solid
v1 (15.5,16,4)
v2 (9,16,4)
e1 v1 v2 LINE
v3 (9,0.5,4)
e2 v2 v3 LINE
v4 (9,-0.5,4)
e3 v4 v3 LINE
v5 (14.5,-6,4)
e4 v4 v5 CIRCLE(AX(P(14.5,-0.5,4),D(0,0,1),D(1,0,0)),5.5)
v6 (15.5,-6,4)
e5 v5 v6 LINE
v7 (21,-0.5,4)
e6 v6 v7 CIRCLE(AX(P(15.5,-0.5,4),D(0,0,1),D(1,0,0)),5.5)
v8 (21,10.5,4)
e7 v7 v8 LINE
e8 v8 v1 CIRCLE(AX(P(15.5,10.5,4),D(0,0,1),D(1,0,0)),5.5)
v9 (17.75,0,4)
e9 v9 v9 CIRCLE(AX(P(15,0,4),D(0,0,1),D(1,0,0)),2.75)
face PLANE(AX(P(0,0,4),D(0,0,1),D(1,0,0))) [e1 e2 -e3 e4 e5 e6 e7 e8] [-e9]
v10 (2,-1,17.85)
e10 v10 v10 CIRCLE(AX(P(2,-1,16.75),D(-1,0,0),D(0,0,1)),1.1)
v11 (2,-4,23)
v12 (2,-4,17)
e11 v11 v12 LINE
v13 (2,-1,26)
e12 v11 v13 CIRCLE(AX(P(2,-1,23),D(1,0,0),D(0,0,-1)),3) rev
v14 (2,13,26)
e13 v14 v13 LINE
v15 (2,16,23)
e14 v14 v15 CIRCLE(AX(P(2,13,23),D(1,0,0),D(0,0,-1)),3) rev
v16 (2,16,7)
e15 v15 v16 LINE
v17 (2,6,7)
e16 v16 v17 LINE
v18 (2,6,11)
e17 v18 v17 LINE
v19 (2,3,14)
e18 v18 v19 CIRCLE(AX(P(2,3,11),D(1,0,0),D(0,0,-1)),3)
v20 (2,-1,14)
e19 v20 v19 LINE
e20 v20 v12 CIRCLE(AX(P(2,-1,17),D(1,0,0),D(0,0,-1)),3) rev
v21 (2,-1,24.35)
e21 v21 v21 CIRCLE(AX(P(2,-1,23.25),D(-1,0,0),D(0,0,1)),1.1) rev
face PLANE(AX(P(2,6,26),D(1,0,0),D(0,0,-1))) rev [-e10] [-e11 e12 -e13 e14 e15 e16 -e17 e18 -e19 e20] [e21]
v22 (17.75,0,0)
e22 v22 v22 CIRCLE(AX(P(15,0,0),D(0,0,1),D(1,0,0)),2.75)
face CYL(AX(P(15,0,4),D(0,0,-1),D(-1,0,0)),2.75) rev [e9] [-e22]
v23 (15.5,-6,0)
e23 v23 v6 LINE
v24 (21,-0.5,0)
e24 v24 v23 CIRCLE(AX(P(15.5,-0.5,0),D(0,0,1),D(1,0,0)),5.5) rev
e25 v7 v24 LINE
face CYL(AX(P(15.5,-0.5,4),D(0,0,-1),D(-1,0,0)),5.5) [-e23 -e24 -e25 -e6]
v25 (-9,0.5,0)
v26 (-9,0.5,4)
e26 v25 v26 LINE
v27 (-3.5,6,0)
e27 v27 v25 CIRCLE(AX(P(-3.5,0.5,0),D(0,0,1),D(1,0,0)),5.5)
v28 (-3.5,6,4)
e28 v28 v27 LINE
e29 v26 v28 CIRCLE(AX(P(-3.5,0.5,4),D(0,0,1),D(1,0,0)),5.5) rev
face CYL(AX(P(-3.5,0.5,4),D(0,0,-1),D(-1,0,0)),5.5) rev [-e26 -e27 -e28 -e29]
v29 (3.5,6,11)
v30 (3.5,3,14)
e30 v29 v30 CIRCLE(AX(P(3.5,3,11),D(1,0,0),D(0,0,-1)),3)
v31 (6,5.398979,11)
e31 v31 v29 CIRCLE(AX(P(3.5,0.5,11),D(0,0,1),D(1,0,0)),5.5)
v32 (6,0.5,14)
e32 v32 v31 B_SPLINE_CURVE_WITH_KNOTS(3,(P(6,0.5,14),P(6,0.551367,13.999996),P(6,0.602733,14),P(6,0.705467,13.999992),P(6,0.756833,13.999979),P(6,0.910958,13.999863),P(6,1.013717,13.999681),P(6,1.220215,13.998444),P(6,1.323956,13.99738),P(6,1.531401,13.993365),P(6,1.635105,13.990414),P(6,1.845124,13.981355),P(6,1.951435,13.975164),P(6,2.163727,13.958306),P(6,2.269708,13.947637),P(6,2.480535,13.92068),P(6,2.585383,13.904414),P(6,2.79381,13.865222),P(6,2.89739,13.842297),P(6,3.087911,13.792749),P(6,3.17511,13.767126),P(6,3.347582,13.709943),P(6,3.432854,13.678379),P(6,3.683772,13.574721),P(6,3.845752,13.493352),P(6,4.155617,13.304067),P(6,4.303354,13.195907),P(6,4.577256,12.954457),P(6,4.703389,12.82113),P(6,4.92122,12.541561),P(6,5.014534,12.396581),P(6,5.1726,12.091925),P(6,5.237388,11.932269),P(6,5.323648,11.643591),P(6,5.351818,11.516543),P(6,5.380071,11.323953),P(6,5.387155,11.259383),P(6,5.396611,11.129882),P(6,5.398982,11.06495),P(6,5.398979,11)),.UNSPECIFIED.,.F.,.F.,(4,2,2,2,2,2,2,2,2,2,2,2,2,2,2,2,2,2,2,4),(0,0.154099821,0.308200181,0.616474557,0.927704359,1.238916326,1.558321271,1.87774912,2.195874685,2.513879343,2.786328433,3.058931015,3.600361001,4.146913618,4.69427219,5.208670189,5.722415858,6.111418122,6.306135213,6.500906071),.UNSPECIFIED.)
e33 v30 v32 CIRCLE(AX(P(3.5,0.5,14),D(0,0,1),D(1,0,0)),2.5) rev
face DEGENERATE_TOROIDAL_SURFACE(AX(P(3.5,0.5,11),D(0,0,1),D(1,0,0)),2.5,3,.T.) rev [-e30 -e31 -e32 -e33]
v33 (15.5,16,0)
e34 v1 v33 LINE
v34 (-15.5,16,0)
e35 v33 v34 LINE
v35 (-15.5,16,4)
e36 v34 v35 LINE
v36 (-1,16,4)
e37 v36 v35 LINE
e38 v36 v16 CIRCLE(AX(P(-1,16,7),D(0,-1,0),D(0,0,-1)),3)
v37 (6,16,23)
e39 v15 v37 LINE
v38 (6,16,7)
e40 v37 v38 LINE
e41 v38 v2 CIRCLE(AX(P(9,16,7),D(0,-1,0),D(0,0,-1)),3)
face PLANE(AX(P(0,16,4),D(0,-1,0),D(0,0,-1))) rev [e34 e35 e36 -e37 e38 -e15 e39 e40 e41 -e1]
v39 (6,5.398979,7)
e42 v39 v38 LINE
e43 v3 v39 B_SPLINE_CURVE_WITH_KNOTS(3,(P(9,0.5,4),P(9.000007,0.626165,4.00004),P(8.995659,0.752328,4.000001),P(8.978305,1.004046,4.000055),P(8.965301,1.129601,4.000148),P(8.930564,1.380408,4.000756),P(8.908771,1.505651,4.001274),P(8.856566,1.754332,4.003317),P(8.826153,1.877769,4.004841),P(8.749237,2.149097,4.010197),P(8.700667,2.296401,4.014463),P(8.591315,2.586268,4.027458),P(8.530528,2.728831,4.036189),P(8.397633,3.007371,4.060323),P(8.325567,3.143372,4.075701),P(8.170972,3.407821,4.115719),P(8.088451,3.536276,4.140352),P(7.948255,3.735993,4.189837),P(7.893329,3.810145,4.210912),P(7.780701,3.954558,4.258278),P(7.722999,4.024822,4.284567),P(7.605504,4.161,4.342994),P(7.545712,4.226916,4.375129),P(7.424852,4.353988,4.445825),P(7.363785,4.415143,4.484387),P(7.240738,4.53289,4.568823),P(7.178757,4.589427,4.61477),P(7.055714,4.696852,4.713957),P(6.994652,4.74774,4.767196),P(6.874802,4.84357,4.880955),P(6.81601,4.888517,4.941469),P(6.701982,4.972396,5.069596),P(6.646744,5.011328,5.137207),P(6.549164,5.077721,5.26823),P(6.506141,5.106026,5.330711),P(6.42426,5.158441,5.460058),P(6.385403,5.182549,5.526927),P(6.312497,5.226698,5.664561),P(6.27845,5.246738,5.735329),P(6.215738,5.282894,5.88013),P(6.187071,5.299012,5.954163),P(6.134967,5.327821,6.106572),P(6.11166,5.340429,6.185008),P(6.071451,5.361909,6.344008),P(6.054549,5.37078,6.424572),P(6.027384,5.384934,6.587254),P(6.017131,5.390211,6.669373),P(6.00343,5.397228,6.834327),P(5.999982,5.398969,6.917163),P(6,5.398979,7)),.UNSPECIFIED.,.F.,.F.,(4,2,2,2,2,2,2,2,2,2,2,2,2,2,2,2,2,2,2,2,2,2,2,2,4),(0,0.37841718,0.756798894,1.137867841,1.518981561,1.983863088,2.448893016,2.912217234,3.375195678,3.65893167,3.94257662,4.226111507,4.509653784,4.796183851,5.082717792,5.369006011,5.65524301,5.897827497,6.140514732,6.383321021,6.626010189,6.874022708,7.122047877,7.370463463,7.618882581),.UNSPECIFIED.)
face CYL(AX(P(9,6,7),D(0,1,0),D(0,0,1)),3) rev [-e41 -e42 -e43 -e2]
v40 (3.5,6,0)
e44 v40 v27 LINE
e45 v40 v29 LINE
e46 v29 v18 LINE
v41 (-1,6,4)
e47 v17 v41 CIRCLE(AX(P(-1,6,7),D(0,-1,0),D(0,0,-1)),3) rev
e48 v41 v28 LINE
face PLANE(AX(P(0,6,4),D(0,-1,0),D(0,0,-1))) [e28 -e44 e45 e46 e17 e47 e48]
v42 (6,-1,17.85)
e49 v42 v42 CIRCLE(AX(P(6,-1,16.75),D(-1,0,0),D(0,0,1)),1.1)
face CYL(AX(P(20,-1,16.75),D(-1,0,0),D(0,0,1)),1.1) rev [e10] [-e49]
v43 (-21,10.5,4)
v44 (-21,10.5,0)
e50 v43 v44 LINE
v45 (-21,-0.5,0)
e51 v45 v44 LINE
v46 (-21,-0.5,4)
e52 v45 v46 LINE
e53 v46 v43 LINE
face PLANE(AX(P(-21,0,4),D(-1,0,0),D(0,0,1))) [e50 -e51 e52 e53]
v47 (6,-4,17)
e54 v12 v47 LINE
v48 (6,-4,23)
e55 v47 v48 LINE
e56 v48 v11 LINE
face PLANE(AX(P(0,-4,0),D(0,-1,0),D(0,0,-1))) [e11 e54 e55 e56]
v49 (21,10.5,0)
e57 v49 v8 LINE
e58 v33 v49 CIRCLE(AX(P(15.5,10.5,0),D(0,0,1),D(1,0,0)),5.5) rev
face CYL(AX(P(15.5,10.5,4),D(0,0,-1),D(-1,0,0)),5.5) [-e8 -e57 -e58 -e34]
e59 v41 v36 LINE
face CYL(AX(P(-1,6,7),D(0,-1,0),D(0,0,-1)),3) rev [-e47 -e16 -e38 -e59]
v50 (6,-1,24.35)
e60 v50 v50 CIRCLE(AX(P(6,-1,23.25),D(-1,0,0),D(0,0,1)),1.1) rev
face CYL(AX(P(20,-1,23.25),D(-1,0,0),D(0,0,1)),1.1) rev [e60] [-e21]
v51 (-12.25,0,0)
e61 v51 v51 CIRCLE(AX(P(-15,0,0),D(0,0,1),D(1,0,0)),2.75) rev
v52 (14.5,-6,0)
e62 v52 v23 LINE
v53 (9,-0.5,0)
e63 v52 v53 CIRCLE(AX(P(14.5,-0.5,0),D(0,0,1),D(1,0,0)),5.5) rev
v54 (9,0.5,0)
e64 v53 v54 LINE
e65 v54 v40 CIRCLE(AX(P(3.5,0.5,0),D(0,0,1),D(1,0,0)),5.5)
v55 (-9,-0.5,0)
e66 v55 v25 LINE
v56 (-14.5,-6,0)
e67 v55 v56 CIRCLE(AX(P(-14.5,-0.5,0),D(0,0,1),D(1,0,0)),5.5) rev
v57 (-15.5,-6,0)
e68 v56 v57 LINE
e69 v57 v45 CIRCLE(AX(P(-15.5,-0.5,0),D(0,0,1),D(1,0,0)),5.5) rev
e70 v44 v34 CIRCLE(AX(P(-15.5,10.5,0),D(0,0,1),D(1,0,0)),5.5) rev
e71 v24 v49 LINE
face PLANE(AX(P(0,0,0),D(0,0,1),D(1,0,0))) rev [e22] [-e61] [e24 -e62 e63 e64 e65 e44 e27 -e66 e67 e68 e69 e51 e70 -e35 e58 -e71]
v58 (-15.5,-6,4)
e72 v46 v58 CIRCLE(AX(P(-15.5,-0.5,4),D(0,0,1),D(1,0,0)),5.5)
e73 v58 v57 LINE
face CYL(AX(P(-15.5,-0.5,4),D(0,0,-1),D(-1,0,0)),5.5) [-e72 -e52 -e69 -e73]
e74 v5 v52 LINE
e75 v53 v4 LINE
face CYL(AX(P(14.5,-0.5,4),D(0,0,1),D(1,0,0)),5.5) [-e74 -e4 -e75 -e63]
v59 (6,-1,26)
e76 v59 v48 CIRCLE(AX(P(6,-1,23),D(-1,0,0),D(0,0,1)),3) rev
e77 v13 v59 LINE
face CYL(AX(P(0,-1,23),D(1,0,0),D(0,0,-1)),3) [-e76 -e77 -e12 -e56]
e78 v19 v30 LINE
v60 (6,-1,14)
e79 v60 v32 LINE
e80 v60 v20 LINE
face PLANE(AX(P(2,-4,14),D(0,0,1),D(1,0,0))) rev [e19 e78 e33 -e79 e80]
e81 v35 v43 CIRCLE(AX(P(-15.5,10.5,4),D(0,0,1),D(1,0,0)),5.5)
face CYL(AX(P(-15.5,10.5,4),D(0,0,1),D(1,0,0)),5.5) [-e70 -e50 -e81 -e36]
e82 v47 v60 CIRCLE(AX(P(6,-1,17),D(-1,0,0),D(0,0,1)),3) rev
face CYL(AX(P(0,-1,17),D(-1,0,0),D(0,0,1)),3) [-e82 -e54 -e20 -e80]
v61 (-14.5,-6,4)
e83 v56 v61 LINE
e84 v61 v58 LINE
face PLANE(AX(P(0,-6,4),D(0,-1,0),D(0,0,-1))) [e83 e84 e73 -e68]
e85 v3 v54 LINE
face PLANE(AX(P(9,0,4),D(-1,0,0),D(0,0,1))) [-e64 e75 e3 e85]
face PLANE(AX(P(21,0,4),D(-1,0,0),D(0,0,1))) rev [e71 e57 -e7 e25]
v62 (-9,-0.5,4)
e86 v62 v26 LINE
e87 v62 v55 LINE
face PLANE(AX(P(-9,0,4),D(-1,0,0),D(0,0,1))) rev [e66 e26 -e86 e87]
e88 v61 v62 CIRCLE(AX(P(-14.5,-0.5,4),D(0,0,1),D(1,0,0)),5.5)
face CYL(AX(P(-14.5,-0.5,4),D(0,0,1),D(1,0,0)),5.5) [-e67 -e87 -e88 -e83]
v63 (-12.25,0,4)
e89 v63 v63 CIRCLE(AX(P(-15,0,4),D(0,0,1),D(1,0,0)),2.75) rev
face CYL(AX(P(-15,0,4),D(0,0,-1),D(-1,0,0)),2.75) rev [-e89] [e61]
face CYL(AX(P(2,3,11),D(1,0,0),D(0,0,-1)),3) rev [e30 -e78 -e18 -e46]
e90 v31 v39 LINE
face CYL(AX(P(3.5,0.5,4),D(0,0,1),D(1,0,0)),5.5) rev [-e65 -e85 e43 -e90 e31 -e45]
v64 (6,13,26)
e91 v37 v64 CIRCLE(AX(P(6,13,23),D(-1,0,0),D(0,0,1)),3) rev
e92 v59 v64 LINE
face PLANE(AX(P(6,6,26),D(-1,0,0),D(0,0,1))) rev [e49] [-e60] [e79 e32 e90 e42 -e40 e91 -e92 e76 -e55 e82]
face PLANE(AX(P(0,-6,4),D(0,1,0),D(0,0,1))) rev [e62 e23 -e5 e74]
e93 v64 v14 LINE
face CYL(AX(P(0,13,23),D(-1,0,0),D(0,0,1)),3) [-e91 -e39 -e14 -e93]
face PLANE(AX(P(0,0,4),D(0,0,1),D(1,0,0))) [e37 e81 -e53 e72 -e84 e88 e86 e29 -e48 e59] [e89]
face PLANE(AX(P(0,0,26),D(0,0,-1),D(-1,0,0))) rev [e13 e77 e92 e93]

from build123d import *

# Parameters (mm, degrees)
SKETCH1_W           = 12
SKETCH1_H           = 12
SKETCH1_R           = 2.75
BOSS_EXTRUDE1_DEPTH = 4
SKETCH2_W           = 4
SKETCH2_H           = 10
BOSS_EXTRUDE2_DEPTH = 22
SKETCH3_W           = 4
SKETCH3_H           = 12
BOSS_EXTRUDE3_DEPTH = 10
SKETCH4_R           = 1.1
CUT_EXTRUDE1_DEPTH  = 18
FILLET1_R           = 5.5
FILLET2_R           = 3


with BuildPart() as part:
    # Sketch1 → Boss-Extrude1 (new body)
    # profile 1 of 4: a face of its own
    with BuildSketch(Plane.XY):
        Polygon((9, 6), (9, 0), (9, -6), (21, -6), (21, 6), align=None)
        with BuildLine():
            ThreePointArc((17.75, 0), (15, -2.75), (12.25, 0))
            ThreePointArc((12.25, 0), (15, 2.75), (17.75, 0))
        make_face(mode=Mode.SUBTRACT)
    # profile 2 of 4: a face of its own
    with BuildSketch(Plane.XY):
        Polygon((0, 6), (9, 6), (21, 6), (21, 16), (0, 16), align=None)
    # profile 3 of 4: a face of its own
    with BuildSketch(Plane.XY):
        Polygon((-9, 6), (0, 6), (0, 16), (-21, 16), (-21, 6), align=None)
    # profile 4 of 4: a face of its own
    with BuildSketch(Plane.XY):
        with Locations((-15, 0)):
            Rectangle(SKETCH1_W, SKETCH1_H)
        with Locations((-15, 0)):
            Circle(SKETCH1_R, mode=Mode.SUBTRACT)
    extrude(amount=BOSS_EXTRUDE1_DEPTH)

    # Sketch2 → Boss-Extrude2 (add)
    with BuildSketch(Plane.XY.offset(4)):
        with Locations((4, 11)):
            Rectangle(SKETCH2_W, SKETCH2_H)
    extrude(amount=BOSS_EXTRUDE2_DEPTH)

    # Sketch3 → Boss-Extrude3 (add)
    with BuildSketch(Plane.XZ.offset(-6)):
        with Locations((4, 20)):
            Rectangle(SKETCH3_W, SKETCH3_H)
    extrude(amount=BOSS_EXTRUDE3_DEPTH)

    # Sketch4 → Cut-Extrude1 (cut)
    with BuildSketch(Plane.ZY.offset(-2)):
        with Locations((23.25, -1)):
            Circle(SKETCH4_R)
        with Locations((16.75, -1)):
            Circle(SKETCH4_R)
    extrude(amount=-CUT_EXTRUDE1_DEPTH, mode=Mode.SUBTRACT)

    # Fillet1
    fillet1_edges = [part.edges().sort_by_distance(p)[0] for p in [
        (-21, 16, 2),
        (21, 16, 2),
        (21, -6, 2),
        (9, -6, 2),
        (9, 6, 2),
        (-9, 6, 2),
        (-9, -6, 2),
        (-21, -6, 2),
    ]]
    fillet(fillet1_edges, radius=FILLET1_R)

    # Fillet2
    fillet2_edges = [part.edges().sort_by_distance(p)[0] for p in [
        (2.75, 6, 14),
        (4.785615189, 5.847634392, 14),
        (6, 10.699489743, 4),
        (2, 11, 4),
        (4, 16, 26),
        (4, -4, 26),
        (4, -4, 14),
    ]]
    fillet(fillet2_edges, radius=FILLET2_R - 0.0001)  # a hair under: the kernel refuses the full size


solid = part.part
